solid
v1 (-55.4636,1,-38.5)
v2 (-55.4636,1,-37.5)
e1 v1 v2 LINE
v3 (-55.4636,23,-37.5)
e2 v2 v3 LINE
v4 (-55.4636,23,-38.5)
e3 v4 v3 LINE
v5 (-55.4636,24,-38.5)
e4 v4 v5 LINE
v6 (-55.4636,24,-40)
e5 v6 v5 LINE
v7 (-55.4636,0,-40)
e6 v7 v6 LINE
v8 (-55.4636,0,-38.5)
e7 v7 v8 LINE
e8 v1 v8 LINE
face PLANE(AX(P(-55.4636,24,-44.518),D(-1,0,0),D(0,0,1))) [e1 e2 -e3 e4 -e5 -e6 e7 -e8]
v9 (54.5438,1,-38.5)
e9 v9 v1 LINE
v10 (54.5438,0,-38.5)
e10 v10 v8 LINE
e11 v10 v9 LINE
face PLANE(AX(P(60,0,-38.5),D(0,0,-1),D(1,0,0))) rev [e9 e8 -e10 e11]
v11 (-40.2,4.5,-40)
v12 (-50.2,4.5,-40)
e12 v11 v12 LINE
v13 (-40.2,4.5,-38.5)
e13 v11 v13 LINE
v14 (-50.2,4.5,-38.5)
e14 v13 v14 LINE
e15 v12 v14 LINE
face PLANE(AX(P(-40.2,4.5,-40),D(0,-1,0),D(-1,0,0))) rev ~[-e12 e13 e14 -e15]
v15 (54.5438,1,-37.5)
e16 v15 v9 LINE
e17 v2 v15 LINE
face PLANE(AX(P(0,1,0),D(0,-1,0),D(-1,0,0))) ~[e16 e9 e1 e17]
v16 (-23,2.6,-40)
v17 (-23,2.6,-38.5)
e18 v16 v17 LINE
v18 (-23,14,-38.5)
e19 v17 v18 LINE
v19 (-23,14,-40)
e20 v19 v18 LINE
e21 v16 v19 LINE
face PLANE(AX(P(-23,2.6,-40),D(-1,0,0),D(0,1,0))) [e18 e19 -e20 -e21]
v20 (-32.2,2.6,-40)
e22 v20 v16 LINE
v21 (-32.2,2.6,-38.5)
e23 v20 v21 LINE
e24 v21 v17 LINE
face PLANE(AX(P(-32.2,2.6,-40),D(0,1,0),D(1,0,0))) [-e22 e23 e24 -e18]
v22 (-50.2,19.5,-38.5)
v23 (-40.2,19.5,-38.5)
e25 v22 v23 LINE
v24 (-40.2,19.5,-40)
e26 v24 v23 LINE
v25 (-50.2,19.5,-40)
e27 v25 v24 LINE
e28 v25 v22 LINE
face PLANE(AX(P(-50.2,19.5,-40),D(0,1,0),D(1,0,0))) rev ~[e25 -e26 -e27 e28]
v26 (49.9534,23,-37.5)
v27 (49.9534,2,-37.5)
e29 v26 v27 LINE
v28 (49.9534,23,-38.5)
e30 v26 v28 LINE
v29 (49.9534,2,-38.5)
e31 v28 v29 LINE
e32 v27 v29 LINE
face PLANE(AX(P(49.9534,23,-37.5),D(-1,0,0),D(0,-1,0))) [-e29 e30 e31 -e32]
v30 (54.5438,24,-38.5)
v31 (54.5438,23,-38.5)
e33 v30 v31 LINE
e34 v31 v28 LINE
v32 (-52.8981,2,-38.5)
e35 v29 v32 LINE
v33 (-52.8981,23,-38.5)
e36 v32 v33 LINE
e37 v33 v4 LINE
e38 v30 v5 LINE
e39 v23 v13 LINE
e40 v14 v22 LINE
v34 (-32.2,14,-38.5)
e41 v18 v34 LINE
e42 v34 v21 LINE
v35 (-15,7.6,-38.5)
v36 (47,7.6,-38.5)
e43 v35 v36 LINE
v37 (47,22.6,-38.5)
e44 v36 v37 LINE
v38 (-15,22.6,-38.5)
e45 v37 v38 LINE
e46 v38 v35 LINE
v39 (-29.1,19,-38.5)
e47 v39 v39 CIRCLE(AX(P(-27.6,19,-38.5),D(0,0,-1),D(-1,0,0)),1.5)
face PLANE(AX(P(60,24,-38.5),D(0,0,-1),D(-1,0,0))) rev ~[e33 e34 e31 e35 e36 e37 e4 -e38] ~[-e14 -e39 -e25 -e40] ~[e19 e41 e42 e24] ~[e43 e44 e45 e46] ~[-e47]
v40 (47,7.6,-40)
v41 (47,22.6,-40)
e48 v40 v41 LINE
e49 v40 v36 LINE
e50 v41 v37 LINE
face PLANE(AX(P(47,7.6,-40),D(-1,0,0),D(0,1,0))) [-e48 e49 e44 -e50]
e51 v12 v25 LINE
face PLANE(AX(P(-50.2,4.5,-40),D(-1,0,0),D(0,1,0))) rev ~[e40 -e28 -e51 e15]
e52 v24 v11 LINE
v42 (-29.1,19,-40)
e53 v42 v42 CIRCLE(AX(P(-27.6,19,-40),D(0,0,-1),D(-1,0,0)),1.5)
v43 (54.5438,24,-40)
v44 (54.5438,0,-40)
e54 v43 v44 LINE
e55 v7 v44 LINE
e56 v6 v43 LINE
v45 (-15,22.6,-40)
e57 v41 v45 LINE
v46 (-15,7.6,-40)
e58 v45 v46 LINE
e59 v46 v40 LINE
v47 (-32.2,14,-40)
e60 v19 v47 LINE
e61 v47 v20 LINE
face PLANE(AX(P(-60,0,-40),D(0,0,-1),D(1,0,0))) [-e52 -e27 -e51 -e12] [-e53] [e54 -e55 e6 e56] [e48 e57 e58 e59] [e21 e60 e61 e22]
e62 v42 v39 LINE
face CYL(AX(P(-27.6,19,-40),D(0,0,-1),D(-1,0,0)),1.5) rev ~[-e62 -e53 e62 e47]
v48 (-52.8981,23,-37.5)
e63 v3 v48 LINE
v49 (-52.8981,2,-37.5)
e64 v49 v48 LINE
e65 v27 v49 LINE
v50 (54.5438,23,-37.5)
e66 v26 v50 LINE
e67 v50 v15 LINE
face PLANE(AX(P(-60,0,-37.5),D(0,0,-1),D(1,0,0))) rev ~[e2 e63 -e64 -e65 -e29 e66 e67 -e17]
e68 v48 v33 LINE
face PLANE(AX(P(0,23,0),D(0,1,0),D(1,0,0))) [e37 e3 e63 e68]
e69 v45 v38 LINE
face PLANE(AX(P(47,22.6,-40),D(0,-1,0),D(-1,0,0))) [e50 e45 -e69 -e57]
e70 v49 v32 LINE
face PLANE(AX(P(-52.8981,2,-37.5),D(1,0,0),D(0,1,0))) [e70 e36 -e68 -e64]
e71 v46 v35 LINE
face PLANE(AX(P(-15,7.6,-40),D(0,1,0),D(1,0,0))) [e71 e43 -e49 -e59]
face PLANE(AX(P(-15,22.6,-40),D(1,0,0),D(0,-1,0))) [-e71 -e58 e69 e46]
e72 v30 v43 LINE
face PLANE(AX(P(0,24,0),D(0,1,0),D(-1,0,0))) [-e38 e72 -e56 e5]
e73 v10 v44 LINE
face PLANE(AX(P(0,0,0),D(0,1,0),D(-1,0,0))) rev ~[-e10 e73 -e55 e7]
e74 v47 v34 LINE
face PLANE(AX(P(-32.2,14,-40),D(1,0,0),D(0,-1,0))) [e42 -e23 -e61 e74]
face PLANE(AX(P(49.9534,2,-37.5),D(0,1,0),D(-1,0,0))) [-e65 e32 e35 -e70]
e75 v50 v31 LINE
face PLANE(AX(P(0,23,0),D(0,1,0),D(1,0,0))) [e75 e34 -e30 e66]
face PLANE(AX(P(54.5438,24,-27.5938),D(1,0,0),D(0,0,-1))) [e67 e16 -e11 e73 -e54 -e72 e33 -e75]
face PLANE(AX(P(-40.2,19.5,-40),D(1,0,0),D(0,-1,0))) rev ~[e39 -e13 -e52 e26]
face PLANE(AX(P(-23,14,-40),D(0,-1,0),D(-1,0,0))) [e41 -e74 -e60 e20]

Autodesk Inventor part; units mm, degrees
ref_plane "YZ Plane" through (0, 0, 0) normal (1, 0, 0) x (0, 1, 0)
ref_plane "XZ Plane" through (0, 0, 0) normal (0, 1, 0) x (-1, 0, 0)
sketch "Sketch1" plane through (0, 0, 0) normal (0, 1, 0) x (-1, 0, 0)
  line L0 (60, -40) -> (-60, -40)
  line L1 (-65, -35) -> (-65, 35)
  line L2 (-60, 40) -> (60, 40)
  line L3 (65, 35) -> (65, -35)
  arc A0 (60, -40) -> (65, -35) centre (60, -35) ccw
  arc A1 (-65, -35) -> (-60, -40) centre (-60, -35) ccw
  arc A2 (-60, 40) -> (-65, 35) centre (-60, 35) ccw
  arc A3 (65, 35) -> (60, 40) centre (60, 35) ccw
  line L4 (60, -37.5) -> (-60, -37.5)
  line L5 (-62.5, -35) -> (-62.5, 35)
  line L6 (-60, 37.5) -> (60, 37.5)
  line L7 (62.5, 35) -> (62.5, -35)
  arc A4 (62.5, 35) -> (60, 37.5) centre (60, 35) ccw
  arc A5 (60, -37.5) -> (62.5, -35) centre (60, -35) ccw
  arc A6 (-62.5, -35) -> (-60, -37.5) centre (-60, -35) ccw
  arc A7 (-60, 37.5) -> (-62.5, 35) centre (-60, 35) ccw
  point P0 (0, 0)
  point P1 (-65, 40)
  point P2 (-65, -40)
  point P3 (65, 40)
  dimension "d0" = 130
  dimension "d1" = 80
  dimension "d2" = 5
  dimension "d3" = 2.5
  dimension "d4" = 2.5
  dimension "d5" = 2.5
  dimension "d6" = 2.5
  dimension "d7" = 2.5
  dimension "d32" = 65
  dimension "d33" = 40
extrude "Extrusion1" add sketch "Sketch1" along normal blind 24
sketch "Sketch2" plane through (0, 24, 0) normal (0, 1, 0) x (1, 0, 0)
  line L0 (-60, -38.5) -> (60, -38.5)
  line L1 (63.5, -35) -> (63.5, 35)
  line L2 (60, 38.5) -> (-60, 38.5)
  line L3 (-63.5, 35) -> (-63.5, -35)
  line L4 (-60, 37.5) -> (60, 37.5) projected
  line L5 (62.5, 35) -> (62.5, -35) projected
  line L6 (60, -37.5) -> (-60, -37.5) projected
  line L7 (-62.5, -35) -> (-62.5, 35) projected
  arc A0 (-63.5, -35) -> (-60, -38.5) centre (-60, -35) ccw
  arc A1 (-60, 38.5) -> (-63.5, 35) centre (-60, 35) ccw
  arc A2 (63.5, 35) -> (60, 38.5) centre (60, 35) ccw
  arc A3 (60, -38.5) -> (63.5, -35) centre (60, -35) ccw
  point P0 (0, 0)
  dimension "d10" = 1
  dimension "d11" = 1
  dimension "d12" = 1
  dimension "d13" = 1
  dimension "d14" = 3.5
extrude "Extrusion2" cut sketch "Sketch2" against normal blind 1
ref_plane "Work Plane1" through (0, 12, 0) normal (0, 1, 0) x (1, 0, 0)
mirror "Mirror1" about plane through (0, 12, 0) normal (0, 1, 0) of "Extrusion2"
sketch "Sketch3" plane through (0, 23, 0) normal (0, 1, 0) x (1, 0, 0)
  line L0 (-56.5, 37.5) -> (-62.5, 37.5)
  line L1 (-62.5, 37.5) -> (-62.5, 31.5)
  line L2 (-62.5, 31.5) -> (-56.5, 31.5)
  line L3 (-56.5, 31.5) -> (-56.5, 37.5)
  line L4 (60, 37.5) -> (-60, 37.5) projected
  line L5 (-62.5, 35) -> (-62.5, -35) projected
  circle A0 centre (-60, 35) radius 2.4
  arc A1 (-60, 37.5) -> (-62.5, 35) centre (-60, 35) ccw projected
  point P0 (0, 0)
  dimension "d18" = 6
  dimension "d19" = 6
  dimension "d20" = 4.8
extrude "Extrusion3" add sketch "Sketch3" against normal up to surface (22 mm away)
fillet "Fillet2" radius 3.5 1 edges at (-56.5, 12, -31.5)
mirror "Mirror2" about plane through (0, 0, 0) normal (0, 0, 1) of "Extrusion3", "Fillet2"
mirror "Mirror3" about plane through (0, 0, 0) normal (1, 0, 0) of "Fillet2", "Extrusion3", "Mirror2"
sketch "Sketch7" plane through (60, 0, -40) normal (0, 0, -1) x (-1, 0, 0)
  line L0 (13, 22.6) -> (75, 22.6)
  line L1 (75, 22.6) -> (75, 7.6)
  line L2 (75, 7.6) -> (13, 7.6)
  line L3 (13, 7.6) -> (13, 22.6)
  line L4 (-5, 0) -> (-5, 24) projected
  line L5 (0, 0) -> (120, 0) projected
  point P0 (60, 0)
  dimension "d35" = 62
  dimension "d36" = 15
  dimension "d37" = 18
  dimension "d38" = 7.6
extrude "Extrusion4" cut sketch "Sketch7" against normal blind 24
sketch "Sketch8" plane through (-56.5, 1, -37.5) normal (0, 0, 1) x (1, 0, 0)
  line L0 (-3.5, 22) -> (116.5, 22) projected
  line L1 (3.6019, 22) -> (106.4534, 22)
  line L2 (106.4534, 22) -> (106.4534, 1)
  line L3 (106.4534, 1) -> (3.6019, 1)
  line L4 (3.6019, 1) -> (3.6019, 22)
  point P0 (56.5, -1)
  dimension "d43" = 21
extrude "Extrusion5" cut sketch "Sketch8" against normal blind 1
sketch "Sketch9" plane through (60, 0, -40) normal (0, 0, -1) x (-1, 0, 0)
  line L0 (83, 14) -> (92.2, 14)
  line L1 (92.2, 14) -> (92.2, 2.6)
  line L2 (92.2, 2.6) -> (83, 2.6)
  line L3 (83, 2.6) -> (83, 14)
  line L4 (75, 22.6) -> (75, 7.6) projected
  line L5 (100.2, 4.5) -> (110.2, 4.5)
  line L6 (110.2, 4.5) -> (110.2, 19.5)
  line L7 (110.2, 19.5) -> (100.2, 19.5)
  line L8 (100.2, 19.5) -> (100.2, 4.5)
  circle A0 centre (87.6, 19) radius 1.5
  line L9 (10.0466, 2) -> (112.8981, 2) projected
  line L10 (0, 24) -> (120, 24) projected
  point P0 (60, 0)
  point P1 (83, 8.3)
  dimension "d44" = 8
  dimension "d45" = 9.2
  dimension "d46" = 11.4
  dimension "d47" = 10
  dimension "d48" = 15
  dimension "d49" = 8
  dimension "d50" = 3
  dimension "d51" = 5
  dimension "d54" = 0.6
  dimension "d55" = 4.5
extrude "Extrusion6" cut sketch "Sketch9" against normal blind 2
sketch "Sketch10" plane through (0, 24, 0) normal (0, 1, 0) x (1, 0, 0)
  line L0 (-65.5813, 44.518) -> (-55.4636, 44.518)
  line L1 (-55.4636, 44.518) -> (-55.4636, 27.5938)
  line L2 (-55.4636, 27.5938) -> (54.5438, 27.5938)
  line L3 (54.5438, 27.5938) -> (54.5438, 46.5416)
  line L4 (54.5438, 46.5416) -> (69.4444, 46.5416)
  line L5 (69.4444, 46.5416) -> (73.6755, -45.2538)
  line L6 (73.6755, -45.2538) -> (-73.3076, -45.2538)
  line L7 (-73.3076, -45.2538) -> (-65.5813, 44.518)
  point P0 (0, 0)
extrude "Extrusion7" cut sketch "Sketch10" against normal through all
equation "\"d4\" = d3"
equation "\"d5\" = d3"
equation "\"d6\" = d3"
equation "\"d32\" = 0.5 * d0"
equation "\"d33\" = 0.5 * d1"
equation "\"d11\" = d10"
equation "\"d12\" = d10"
equation "\"d13\" = d10"
properties part number "front_panel"
